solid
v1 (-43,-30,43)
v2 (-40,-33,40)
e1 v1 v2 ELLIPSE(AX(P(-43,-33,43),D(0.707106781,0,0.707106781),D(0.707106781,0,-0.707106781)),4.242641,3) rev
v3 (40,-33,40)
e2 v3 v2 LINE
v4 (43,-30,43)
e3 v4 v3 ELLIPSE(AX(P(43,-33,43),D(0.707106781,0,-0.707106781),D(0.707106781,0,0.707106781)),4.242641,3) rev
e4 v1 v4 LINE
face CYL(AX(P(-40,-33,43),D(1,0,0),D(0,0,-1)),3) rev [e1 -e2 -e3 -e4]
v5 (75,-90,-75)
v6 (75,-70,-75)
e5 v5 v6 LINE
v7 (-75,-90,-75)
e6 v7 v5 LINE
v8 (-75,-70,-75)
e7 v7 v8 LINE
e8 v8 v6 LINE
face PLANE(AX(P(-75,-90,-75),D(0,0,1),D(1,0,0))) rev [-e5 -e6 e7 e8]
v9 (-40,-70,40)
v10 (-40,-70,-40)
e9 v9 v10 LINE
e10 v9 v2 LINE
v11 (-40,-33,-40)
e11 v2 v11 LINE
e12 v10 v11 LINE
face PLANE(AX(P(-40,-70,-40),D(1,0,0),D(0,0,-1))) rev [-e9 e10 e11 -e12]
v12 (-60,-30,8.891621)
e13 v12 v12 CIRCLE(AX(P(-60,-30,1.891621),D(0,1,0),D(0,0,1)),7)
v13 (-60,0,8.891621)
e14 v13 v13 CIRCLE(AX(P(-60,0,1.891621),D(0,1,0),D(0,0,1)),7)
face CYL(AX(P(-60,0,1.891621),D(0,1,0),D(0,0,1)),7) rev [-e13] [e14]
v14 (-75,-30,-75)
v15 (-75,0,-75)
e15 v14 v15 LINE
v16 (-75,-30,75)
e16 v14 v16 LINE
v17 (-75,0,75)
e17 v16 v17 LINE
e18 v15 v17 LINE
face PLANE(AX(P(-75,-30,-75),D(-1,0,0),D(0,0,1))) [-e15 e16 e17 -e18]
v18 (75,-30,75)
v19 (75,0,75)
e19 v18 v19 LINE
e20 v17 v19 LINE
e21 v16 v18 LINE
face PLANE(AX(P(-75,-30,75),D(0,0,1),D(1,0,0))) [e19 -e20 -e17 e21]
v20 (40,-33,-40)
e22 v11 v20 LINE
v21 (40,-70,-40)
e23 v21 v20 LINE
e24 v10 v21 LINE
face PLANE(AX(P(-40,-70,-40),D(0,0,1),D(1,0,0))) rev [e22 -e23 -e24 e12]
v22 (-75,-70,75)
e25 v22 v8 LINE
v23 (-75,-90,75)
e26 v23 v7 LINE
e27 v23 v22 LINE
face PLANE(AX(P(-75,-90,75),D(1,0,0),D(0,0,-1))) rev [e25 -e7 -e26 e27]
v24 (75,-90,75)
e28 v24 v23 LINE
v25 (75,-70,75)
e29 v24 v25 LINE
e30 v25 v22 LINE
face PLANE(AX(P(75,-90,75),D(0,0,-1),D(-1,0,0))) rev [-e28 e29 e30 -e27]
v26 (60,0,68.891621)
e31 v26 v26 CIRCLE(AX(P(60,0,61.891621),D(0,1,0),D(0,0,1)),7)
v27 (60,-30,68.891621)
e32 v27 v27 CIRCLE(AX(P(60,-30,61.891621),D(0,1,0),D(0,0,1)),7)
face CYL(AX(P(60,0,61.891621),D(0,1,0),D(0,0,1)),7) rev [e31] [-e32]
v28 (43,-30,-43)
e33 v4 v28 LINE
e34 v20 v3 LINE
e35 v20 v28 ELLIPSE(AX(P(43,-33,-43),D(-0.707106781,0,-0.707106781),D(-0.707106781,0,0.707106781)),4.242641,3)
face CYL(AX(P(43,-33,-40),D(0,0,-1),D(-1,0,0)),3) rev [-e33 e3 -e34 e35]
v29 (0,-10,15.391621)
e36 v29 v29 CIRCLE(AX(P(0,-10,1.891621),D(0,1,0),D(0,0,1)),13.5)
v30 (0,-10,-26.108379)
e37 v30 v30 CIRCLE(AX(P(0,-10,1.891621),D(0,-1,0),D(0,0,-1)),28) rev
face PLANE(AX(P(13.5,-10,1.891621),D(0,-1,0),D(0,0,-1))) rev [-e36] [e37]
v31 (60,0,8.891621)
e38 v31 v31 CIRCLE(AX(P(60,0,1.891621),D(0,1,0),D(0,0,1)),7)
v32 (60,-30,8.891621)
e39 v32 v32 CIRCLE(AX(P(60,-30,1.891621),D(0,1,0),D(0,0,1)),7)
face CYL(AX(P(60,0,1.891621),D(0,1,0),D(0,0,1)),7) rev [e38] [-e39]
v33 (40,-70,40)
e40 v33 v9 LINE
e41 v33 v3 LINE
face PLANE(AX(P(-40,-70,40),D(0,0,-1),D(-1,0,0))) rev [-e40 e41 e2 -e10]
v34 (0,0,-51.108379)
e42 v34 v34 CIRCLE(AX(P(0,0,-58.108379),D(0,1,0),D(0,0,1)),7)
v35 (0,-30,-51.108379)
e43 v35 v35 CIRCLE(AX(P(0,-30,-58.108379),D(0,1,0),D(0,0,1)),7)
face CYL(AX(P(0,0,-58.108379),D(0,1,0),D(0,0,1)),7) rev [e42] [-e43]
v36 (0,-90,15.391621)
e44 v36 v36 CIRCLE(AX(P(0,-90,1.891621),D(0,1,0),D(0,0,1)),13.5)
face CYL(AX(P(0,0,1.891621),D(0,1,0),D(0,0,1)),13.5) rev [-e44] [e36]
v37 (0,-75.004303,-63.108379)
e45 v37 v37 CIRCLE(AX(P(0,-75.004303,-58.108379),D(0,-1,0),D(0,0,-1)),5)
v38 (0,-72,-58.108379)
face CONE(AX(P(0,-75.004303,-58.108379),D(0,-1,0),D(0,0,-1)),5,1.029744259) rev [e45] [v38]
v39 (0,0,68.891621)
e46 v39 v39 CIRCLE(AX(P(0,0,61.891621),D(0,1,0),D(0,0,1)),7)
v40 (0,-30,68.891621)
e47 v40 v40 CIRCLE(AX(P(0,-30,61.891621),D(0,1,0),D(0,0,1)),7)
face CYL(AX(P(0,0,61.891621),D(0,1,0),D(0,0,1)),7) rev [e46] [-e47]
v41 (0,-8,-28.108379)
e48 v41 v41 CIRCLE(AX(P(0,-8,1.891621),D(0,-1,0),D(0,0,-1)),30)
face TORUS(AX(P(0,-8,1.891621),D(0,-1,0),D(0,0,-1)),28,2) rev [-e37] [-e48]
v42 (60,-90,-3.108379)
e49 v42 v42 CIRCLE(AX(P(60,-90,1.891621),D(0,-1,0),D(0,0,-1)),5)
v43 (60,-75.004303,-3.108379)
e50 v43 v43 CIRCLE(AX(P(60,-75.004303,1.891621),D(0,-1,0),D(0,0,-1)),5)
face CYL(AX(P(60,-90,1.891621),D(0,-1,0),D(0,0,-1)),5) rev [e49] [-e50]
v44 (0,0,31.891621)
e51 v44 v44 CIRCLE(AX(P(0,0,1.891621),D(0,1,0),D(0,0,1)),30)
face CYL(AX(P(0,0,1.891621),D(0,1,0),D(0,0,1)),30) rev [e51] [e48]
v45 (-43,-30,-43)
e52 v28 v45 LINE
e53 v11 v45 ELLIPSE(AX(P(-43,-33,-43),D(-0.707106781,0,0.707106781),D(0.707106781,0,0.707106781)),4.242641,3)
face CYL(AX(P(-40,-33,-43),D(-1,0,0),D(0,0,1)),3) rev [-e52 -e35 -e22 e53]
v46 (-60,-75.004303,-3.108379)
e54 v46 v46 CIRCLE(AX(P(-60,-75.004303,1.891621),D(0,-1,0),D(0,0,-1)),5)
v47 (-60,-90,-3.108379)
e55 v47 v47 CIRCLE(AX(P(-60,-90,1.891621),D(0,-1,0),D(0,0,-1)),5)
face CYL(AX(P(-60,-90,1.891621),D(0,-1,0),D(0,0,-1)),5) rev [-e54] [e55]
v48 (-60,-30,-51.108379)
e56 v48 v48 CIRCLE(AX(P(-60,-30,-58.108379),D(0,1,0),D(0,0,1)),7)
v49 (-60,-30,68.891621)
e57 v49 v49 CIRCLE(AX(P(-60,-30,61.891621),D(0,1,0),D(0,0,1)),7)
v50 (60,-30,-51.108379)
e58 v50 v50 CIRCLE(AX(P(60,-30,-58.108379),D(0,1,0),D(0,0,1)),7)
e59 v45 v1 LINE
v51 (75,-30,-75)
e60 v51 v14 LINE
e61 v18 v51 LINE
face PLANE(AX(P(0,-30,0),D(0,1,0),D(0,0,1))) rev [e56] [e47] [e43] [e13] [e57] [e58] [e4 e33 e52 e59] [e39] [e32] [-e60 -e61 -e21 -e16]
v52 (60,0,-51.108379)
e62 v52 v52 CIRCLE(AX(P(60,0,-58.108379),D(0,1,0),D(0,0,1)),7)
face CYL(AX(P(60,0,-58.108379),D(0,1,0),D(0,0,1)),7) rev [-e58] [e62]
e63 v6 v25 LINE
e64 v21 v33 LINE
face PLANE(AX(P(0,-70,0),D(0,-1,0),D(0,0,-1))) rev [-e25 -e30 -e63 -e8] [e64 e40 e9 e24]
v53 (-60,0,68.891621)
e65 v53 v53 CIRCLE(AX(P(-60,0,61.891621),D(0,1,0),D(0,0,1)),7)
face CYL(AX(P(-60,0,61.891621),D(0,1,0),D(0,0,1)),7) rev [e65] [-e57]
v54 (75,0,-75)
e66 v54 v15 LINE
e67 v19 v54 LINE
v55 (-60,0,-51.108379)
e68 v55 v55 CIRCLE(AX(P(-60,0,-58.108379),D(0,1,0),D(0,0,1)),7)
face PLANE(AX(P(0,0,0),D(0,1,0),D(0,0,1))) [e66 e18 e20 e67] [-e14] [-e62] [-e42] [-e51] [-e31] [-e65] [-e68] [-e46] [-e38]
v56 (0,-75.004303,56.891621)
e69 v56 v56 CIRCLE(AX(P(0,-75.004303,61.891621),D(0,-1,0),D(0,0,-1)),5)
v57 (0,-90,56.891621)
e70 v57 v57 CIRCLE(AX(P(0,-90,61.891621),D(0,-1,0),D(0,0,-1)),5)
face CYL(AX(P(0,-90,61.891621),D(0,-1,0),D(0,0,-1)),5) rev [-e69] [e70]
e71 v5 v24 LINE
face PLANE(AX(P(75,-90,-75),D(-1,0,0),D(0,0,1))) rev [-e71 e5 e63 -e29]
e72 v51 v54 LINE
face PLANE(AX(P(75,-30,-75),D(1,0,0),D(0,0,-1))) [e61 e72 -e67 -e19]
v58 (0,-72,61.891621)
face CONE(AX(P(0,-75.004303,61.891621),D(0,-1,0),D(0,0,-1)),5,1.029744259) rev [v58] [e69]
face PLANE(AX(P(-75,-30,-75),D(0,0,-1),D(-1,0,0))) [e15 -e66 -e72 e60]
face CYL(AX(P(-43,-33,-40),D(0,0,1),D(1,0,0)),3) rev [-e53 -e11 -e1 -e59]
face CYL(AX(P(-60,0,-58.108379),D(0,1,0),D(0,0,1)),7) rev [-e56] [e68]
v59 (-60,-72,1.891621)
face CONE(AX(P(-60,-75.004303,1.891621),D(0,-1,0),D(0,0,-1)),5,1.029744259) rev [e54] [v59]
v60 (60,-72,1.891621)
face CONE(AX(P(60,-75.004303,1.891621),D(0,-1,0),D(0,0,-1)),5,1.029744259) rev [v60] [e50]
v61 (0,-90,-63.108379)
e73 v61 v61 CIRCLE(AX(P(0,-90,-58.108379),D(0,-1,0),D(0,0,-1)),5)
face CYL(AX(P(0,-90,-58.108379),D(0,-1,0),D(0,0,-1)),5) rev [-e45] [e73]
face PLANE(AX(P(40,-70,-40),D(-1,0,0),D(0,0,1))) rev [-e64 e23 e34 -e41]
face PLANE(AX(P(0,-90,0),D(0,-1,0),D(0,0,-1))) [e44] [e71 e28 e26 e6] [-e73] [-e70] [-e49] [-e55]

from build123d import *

# Parameters (mm, degrees)
IZIM2_W                     = 150
IZIM2_H                     = 150
Y_KSEKLIK_EKSTR_ZYON1_DEPTH = 30
IZIM3_W                     = 80
IZIM3_H                     = 80
Y_KSEKLIK_EKSTR_ZYON2_DEPTH = 40
IZIM5_W                     = 150
IZIM5_H                     = 150
Y_KSEKLIK_EKSTR_ZYON3_DEPTH = 20
DELIK4_D                    = 27
DELIK4_CBORE_D              = 60
DELIK4_CBORE_DEPTH          = 10
M16_START                   = -30
M16_DI_LI_DELIK1_OUTLINE_R  = 7
M16_DI_LI_DELIK1_DEPTH      = 30
F_10_0_10_AP_DELIK1_D       = 10
F_10_0_10_AP_DELIK1_DEPTH   = 14.995696905
F_10_0_10_AP_DELIK1_TIP     = 3.004303095
RADYUS1_R                   = 3
RADYUS2_R                   = 2


# Read off the part's stored shape, not the designer's step: M16 Dişli Delik1
with BuildPart() as part:
    # Çizim2 → Yükseklik-Ekstrüzyon1 (new body)
    with BuildSketch(Plane(origin=(0, 0, 0), x_dir=(1, 0, 0), z_dir=(0, 1, 0))):
        Rectangle(IZIM2_W, IZIM2_H)
    extrude(amount=-Y_KSEKLIK_EKSTR_ZYON1_DEPTH)

    # Çizim3 → Yükseklik-Ekstrüzyon2 (add)
    with BuildSketch(Plane.XZ.offset(30)):
        Rectangle(IZIM3_W, IZIM3_H)
    extrude(amount=Y_KSEKLIK_EKSTR_ZYON2_DEPTH)

    # Çizim5 → Yükseklik-Ekstrüzyon3 (add)
    with BuildSketch(Plane.XZ.offset(70)):
        Rectangle(IZIM5_W, IZIM5_H)
    extrude(amount=Y_KSEKLIK_EKSTR_ZYON3_DEPTH)

    # Delik4 (through all)
    with Locations(Plane(origin=(0, 0, 1.891621306), x_dir=(0, 0, 1), z_dir=(0, 1, 0))):
        with Locations((0, 0)):
            CounterBoreHole(DELIK4_D / 2, DELIK4_CBORE_D / 2, DELIK4_CBORE_DEPTH)

    # M16 Dişli Delik1 outline → M16 Dişli Delik1 (cut)
    with BuildSketch(Plane(origin=(0, 0, 0), x_dir=(1, 0, 0), z_dir=(0, 1, 0)).offset(M16_START)):
        with Locations((0, -61.891621306)):
            Circle(M16_DI_LI_DELIK1_OUTLINE_R)
        with Locations((60, -1.891621306)):
            Circle(M16_DI_LI_DELIK1_OUTLINE_R)
        with Locations((-60, -1.891621306)):
            Circle(M16_DI_LI_DELIK1_OUTLINE_R)
        with Locations((0, 58.108378694)):
            Circle(M16_DI_LI_DELIK1_OUTLINE_R)
        with Locations((60, 58.108378694)):
            Circle(M16_DI_LI_DELIK1_OUTLINE_R)
        with Locations((-60, -61.891621306)):
            Circle(M16_DI_LI_DELIK1_OUTLINE_R)
        with Locations((-60, 58.108378694)):
            Circle(M16_DI_LI_DELIK1_OUTLINE_R)
        with Locations((60, -61.891621306)):
            Circle(M16_DI_LI_DELIK1_OUTLINE_R)
    extrude(amount=M16_DI_LI_DELIK1_DEPTH, mode=Mode.SUBTRACT)

    # Ø10.0 (10) Çap Delik1
    with Locations(Plane(origin=(0, -90, 0), x_dir=(-1, 0, 0), z_dir=(0, -1, 0))):
        with Locations((0, -1.891621306), (0, 58.108378694), (-60, -1.891621306), (60, -1.891621306), (0, -61.891621306)):
            Hole(F_10_0_10_AP_DELIK1_D / 2, depth=F_10_0_10_AP_DELIK1_DEPTH)
            with Locations((0, 0, -(F_10_0_10_AP_DELIK1_DEPTH + F_10_0_10_AP_DELIK1_TIP / 2))):  # 118° drill point
                Cone(0, F_10_0_10_AP_DELIK1_D / 2, F_10_0_10_AP_DELIK1_TIP, mode=Mode.SUBTRACT)

    # Radyus1
    radyus1_edges = [part.edges().sort_by_distance(p)[0] for p in [
        (40, -30, 0),
        (0, -30, 40),
        (-40, -30, 0),
        (0, -30, -40),
    ]]
    fillet(radyus1_edges, radius=RADYUS1_R)

    # Radyus2
    radyus2_edges = [part.edges().sort_by_distance(p)[0] for p in [
        (0, -10, -28.108378694),
    ]]
    fillet(radyus2_edges, radius=RADYUS2_R)


solid = part.part
